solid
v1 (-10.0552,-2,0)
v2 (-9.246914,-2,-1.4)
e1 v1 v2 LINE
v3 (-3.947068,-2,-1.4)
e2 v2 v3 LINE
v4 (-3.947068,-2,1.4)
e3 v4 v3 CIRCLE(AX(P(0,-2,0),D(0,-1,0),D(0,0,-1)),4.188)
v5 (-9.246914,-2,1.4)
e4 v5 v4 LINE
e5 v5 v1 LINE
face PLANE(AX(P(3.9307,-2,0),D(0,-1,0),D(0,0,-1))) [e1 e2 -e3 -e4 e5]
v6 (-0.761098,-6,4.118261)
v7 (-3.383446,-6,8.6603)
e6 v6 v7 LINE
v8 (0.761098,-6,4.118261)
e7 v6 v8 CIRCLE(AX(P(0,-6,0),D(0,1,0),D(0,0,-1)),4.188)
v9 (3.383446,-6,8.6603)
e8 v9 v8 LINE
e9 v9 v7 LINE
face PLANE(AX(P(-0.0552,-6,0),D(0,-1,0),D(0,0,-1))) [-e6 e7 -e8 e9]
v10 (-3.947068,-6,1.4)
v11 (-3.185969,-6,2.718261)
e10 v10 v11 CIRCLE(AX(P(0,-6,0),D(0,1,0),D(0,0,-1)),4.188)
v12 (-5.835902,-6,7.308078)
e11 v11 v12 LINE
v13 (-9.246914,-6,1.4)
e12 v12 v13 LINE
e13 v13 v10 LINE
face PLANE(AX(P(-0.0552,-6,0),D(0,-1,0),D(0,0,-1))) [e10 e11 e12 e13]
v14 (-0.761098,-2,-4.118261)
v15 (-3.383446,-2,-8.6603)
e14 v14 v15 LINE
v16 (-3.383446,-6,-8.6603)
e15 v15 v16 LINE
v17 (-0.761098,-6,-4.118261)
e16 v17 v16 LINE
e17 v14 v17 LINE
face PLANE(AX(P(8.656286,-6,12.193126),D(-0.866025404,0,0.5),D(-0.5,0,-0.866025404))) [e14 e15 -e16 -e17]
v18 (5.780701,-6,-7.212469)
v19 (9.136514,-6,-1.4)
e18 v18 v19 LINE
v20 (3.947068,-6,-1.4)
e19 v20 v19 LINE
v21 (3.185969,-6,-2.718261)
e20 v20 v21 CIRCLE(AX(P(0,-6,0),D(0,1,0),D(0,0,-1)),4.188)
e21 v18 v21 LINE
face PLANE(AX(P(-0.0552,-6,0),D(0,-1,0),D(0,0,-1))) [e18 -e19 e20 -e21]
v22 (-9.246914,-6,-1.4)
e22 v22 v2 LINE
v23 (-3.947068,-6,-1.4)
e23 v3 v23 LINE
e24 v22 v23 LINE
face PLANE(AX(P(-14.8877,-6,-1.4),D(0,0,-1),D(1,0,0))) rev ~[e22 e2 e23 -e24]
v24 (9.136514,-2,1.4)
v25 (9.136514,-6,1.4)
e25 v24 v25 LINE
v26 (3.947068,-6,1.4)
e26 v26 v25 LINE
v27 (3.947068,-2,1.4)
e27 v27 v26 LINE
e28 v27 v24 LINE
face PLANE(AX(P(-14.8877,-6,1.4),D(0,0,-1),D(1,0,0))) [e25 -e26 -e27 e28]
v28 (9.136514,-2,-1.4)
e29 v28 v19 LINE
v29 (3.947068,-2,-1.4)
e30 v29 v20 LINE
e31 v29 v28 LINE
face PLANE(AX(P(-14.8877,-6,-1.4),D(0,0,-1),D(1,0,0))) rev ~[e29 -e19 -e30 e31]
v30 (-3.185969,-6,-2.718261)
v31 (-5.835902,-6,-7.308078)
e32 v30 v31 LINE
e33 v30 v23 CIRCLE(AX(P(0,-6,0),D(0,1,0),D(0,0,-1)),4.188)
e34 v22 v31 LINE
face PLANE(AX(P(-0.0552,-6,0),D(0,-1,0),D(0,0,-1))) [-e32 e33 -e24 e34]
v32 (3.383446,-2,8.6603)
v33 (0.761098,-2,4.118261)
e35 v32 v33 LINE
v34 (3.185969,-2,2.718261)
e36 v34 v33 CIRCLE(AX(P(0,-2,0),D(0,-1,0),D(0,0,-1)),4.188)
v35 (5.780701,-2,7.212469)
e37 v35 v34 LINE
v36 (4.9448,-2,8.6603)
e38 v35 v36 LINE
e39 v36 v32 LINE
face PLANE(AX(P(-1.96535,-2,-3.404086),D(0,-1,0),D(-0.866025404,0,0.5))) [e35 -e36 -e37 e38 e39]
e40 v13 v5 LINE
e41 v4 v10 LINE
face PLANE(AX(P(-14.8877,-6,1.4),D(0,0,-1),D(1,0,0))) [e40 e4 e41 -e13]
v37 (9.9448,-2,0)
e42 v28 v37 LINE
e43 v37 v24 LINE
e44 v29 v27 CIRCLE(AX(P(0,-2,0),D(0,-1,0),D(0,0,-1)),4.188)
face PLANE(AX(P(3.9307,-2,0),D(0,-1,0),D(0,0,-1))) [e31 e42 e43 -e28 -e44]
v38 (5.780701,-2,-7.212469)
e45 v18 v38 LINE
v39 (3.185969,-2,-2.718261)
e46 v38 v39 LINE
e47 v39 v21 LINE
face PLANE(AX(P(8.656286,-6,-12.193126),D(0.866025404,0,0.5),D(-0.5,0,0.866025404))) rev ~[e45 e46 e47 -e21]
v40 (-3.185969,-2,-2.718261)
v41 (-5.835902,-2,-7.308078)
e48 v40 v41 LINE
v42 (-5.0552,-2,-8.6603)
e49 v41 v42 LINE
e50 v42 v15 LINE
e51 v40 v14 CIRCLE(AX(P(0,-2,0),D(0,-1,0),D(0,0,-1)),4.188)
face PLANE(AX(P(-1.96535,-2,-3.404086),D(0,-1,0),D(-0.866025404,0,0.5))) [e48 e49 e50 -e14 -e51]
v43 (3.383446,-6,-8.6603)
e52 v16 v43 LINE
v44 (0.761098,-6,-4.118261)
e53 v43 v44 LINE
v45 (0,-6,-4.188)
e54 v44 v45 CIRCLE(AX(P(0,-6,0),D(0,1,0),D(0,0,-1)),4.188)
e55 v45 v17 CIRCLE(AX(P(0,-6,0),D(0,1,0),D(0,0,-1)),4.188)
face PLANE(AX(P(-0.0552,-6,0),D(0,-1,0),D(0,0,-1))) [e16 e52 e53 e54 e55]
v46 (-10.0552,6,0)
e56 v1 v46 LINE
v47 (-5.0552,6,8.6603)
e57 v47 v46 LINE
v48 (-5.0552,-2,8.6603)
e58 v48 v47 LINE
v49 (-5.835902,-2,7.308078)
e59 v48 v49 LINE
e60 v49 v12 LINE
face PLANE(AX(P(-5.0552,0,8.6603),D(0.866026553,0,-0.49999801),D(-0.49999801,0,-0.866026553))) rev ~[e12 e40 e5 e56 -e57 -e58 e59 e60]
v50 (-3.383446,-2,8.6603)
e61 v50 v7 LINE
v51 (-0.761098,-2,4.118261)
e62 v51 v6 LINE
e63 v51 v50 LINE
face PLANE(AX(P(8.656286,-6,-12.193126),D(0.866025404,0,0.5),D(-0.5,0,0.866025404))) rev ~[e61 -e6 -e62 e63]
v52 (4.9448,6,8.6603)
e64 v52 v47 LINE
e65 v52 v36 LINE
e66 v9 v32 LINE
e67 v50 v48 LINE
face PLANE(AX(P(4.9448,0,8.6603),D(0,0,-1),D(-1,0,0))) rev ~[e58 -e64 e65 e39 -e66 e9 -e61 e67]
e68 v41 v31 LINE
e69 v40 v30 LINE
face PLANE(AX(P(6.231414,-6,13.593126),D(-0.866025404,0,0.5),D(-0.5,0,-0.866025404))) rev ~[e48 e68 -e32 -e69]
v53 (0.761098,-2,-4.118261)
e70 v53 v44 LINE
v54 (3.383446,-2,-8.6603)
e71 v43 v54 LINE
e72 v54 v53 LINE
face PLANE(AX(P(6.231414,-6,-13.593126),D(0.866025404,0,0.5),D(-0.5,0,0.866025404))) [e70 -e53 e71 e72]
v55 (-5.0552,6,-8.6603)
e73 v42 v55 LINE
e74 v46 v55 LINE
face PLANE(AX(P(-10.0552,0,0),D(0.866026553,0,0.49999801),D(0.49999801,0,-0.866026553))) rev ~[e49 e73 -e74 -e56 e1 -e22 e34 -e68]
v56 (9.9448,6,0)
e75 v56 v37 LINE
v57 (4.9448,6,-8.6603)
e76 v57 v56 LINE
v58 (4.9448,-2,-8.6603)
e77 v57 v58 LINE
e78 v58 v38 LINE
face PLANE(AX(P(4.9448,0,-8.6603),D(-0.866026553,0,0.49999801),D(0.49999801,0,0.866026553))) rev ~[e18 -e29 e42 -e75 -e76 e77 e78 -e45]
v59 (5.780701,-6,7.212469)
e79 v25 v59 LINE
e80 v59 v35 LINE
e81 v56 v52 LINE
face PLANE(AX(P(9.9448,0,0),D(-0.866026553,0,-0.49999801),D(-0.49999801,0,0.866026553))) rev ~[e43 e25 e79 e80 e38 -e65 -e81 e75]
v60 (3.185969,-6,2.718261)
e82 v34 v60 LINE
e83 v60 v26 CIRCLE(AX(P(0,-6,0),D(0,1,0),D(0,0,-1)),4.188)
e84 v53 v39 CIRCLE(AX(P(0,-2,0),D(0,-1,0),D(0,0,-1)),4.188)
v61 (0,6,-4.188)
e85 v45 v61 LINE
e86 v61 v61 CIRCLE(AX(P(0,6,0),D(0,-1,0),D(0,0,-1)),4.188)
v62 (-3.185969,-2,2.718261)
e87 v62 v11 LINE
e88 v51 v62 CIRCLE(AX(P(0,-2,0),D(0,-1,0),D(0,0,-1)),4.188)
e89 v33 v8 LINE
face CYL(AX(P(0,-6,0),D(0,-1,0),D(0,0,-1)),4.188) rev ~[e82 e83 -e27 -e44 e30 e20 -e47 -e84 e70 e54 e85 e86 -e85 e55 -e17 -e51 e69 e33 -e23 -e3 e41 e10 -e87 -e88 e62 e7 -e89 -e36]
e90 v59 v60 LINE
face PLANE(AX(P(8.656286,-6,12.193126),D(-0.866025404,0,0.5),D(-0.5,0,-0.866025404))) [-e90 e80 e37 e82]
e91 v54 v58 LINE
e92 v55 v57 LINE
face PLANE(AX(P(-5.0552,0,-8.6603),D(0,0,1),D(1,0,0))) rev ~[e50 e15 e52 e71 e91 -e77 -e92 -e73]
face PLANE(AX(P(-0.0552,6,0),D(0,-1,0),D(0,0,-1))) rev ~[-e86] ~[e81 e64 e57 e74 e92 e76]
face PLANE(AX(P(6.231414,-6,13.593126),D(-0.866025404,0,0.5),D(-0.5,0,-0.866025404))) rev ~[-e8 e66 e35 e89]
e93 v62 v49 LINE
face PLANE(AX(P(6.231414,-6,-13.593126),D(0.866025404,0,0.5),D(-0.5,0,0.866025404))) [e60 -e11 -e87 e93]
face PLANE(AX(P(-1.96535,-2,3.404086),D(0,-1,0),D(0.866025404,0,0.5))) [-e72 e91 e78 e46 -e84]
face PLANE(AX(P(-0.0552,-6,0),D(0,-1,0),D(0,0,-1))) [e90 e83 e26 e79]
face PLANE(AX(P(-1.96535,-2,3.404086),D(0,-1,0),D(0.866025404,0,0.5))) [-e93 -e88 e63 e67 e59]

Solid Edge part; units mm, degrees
sketch "Sketch1" plane through (0, 0, 0) normal (0, -1, 0) x (1, 0, 0)
  line L0 (-5.0552, -8.6603) -> (4.9448, -8.6603)
  line L1 (4.9448, -8.6603) -> (9.9448, 0)
  line L2 (9.9448, 0) -> (4.9448, 8.6603)
  line L3 (4.9448, 8.6603) -> (-5.0552, 8.6603)
  line L4 (-5.0552, 8.6603) -> (-10.0552, 0)
  line L5 (-10.0552, 0) -> (-5.0552, -8.6603)
extrude "Protrusion1" add sketch "Sketch1" along normal mid plane 12
hole "Hole_1" at (0, -6, 0) direction (0, 1, 0) diameter 8.376 end up to next thread major 10 thread length 2
sketch "Sketch2" plane through (-0.0552, -6, 0) normal (0, -1, 0) x (1, 0, 0)
  line L0 (-14.8325, -1.4) -> (22.8043, -1.4)
  line L1 (22.8043, 1.4) -> (22.8043, -1.4)
  line L2 (-14.8325, 1.4) -> (22.8043, 1.4)
  line L3 (-14.8325, 1.4) -> (-14.8325, -1.4)
extrude "ExtrudedCutout_2" cut sketch "Sketch2" against normal blind 4
pattern_circular "Pattern1" count 3 over 360 about axis through (0, -6, 0) along (0, -1, 0) of "ExtrudedCutout_2"
